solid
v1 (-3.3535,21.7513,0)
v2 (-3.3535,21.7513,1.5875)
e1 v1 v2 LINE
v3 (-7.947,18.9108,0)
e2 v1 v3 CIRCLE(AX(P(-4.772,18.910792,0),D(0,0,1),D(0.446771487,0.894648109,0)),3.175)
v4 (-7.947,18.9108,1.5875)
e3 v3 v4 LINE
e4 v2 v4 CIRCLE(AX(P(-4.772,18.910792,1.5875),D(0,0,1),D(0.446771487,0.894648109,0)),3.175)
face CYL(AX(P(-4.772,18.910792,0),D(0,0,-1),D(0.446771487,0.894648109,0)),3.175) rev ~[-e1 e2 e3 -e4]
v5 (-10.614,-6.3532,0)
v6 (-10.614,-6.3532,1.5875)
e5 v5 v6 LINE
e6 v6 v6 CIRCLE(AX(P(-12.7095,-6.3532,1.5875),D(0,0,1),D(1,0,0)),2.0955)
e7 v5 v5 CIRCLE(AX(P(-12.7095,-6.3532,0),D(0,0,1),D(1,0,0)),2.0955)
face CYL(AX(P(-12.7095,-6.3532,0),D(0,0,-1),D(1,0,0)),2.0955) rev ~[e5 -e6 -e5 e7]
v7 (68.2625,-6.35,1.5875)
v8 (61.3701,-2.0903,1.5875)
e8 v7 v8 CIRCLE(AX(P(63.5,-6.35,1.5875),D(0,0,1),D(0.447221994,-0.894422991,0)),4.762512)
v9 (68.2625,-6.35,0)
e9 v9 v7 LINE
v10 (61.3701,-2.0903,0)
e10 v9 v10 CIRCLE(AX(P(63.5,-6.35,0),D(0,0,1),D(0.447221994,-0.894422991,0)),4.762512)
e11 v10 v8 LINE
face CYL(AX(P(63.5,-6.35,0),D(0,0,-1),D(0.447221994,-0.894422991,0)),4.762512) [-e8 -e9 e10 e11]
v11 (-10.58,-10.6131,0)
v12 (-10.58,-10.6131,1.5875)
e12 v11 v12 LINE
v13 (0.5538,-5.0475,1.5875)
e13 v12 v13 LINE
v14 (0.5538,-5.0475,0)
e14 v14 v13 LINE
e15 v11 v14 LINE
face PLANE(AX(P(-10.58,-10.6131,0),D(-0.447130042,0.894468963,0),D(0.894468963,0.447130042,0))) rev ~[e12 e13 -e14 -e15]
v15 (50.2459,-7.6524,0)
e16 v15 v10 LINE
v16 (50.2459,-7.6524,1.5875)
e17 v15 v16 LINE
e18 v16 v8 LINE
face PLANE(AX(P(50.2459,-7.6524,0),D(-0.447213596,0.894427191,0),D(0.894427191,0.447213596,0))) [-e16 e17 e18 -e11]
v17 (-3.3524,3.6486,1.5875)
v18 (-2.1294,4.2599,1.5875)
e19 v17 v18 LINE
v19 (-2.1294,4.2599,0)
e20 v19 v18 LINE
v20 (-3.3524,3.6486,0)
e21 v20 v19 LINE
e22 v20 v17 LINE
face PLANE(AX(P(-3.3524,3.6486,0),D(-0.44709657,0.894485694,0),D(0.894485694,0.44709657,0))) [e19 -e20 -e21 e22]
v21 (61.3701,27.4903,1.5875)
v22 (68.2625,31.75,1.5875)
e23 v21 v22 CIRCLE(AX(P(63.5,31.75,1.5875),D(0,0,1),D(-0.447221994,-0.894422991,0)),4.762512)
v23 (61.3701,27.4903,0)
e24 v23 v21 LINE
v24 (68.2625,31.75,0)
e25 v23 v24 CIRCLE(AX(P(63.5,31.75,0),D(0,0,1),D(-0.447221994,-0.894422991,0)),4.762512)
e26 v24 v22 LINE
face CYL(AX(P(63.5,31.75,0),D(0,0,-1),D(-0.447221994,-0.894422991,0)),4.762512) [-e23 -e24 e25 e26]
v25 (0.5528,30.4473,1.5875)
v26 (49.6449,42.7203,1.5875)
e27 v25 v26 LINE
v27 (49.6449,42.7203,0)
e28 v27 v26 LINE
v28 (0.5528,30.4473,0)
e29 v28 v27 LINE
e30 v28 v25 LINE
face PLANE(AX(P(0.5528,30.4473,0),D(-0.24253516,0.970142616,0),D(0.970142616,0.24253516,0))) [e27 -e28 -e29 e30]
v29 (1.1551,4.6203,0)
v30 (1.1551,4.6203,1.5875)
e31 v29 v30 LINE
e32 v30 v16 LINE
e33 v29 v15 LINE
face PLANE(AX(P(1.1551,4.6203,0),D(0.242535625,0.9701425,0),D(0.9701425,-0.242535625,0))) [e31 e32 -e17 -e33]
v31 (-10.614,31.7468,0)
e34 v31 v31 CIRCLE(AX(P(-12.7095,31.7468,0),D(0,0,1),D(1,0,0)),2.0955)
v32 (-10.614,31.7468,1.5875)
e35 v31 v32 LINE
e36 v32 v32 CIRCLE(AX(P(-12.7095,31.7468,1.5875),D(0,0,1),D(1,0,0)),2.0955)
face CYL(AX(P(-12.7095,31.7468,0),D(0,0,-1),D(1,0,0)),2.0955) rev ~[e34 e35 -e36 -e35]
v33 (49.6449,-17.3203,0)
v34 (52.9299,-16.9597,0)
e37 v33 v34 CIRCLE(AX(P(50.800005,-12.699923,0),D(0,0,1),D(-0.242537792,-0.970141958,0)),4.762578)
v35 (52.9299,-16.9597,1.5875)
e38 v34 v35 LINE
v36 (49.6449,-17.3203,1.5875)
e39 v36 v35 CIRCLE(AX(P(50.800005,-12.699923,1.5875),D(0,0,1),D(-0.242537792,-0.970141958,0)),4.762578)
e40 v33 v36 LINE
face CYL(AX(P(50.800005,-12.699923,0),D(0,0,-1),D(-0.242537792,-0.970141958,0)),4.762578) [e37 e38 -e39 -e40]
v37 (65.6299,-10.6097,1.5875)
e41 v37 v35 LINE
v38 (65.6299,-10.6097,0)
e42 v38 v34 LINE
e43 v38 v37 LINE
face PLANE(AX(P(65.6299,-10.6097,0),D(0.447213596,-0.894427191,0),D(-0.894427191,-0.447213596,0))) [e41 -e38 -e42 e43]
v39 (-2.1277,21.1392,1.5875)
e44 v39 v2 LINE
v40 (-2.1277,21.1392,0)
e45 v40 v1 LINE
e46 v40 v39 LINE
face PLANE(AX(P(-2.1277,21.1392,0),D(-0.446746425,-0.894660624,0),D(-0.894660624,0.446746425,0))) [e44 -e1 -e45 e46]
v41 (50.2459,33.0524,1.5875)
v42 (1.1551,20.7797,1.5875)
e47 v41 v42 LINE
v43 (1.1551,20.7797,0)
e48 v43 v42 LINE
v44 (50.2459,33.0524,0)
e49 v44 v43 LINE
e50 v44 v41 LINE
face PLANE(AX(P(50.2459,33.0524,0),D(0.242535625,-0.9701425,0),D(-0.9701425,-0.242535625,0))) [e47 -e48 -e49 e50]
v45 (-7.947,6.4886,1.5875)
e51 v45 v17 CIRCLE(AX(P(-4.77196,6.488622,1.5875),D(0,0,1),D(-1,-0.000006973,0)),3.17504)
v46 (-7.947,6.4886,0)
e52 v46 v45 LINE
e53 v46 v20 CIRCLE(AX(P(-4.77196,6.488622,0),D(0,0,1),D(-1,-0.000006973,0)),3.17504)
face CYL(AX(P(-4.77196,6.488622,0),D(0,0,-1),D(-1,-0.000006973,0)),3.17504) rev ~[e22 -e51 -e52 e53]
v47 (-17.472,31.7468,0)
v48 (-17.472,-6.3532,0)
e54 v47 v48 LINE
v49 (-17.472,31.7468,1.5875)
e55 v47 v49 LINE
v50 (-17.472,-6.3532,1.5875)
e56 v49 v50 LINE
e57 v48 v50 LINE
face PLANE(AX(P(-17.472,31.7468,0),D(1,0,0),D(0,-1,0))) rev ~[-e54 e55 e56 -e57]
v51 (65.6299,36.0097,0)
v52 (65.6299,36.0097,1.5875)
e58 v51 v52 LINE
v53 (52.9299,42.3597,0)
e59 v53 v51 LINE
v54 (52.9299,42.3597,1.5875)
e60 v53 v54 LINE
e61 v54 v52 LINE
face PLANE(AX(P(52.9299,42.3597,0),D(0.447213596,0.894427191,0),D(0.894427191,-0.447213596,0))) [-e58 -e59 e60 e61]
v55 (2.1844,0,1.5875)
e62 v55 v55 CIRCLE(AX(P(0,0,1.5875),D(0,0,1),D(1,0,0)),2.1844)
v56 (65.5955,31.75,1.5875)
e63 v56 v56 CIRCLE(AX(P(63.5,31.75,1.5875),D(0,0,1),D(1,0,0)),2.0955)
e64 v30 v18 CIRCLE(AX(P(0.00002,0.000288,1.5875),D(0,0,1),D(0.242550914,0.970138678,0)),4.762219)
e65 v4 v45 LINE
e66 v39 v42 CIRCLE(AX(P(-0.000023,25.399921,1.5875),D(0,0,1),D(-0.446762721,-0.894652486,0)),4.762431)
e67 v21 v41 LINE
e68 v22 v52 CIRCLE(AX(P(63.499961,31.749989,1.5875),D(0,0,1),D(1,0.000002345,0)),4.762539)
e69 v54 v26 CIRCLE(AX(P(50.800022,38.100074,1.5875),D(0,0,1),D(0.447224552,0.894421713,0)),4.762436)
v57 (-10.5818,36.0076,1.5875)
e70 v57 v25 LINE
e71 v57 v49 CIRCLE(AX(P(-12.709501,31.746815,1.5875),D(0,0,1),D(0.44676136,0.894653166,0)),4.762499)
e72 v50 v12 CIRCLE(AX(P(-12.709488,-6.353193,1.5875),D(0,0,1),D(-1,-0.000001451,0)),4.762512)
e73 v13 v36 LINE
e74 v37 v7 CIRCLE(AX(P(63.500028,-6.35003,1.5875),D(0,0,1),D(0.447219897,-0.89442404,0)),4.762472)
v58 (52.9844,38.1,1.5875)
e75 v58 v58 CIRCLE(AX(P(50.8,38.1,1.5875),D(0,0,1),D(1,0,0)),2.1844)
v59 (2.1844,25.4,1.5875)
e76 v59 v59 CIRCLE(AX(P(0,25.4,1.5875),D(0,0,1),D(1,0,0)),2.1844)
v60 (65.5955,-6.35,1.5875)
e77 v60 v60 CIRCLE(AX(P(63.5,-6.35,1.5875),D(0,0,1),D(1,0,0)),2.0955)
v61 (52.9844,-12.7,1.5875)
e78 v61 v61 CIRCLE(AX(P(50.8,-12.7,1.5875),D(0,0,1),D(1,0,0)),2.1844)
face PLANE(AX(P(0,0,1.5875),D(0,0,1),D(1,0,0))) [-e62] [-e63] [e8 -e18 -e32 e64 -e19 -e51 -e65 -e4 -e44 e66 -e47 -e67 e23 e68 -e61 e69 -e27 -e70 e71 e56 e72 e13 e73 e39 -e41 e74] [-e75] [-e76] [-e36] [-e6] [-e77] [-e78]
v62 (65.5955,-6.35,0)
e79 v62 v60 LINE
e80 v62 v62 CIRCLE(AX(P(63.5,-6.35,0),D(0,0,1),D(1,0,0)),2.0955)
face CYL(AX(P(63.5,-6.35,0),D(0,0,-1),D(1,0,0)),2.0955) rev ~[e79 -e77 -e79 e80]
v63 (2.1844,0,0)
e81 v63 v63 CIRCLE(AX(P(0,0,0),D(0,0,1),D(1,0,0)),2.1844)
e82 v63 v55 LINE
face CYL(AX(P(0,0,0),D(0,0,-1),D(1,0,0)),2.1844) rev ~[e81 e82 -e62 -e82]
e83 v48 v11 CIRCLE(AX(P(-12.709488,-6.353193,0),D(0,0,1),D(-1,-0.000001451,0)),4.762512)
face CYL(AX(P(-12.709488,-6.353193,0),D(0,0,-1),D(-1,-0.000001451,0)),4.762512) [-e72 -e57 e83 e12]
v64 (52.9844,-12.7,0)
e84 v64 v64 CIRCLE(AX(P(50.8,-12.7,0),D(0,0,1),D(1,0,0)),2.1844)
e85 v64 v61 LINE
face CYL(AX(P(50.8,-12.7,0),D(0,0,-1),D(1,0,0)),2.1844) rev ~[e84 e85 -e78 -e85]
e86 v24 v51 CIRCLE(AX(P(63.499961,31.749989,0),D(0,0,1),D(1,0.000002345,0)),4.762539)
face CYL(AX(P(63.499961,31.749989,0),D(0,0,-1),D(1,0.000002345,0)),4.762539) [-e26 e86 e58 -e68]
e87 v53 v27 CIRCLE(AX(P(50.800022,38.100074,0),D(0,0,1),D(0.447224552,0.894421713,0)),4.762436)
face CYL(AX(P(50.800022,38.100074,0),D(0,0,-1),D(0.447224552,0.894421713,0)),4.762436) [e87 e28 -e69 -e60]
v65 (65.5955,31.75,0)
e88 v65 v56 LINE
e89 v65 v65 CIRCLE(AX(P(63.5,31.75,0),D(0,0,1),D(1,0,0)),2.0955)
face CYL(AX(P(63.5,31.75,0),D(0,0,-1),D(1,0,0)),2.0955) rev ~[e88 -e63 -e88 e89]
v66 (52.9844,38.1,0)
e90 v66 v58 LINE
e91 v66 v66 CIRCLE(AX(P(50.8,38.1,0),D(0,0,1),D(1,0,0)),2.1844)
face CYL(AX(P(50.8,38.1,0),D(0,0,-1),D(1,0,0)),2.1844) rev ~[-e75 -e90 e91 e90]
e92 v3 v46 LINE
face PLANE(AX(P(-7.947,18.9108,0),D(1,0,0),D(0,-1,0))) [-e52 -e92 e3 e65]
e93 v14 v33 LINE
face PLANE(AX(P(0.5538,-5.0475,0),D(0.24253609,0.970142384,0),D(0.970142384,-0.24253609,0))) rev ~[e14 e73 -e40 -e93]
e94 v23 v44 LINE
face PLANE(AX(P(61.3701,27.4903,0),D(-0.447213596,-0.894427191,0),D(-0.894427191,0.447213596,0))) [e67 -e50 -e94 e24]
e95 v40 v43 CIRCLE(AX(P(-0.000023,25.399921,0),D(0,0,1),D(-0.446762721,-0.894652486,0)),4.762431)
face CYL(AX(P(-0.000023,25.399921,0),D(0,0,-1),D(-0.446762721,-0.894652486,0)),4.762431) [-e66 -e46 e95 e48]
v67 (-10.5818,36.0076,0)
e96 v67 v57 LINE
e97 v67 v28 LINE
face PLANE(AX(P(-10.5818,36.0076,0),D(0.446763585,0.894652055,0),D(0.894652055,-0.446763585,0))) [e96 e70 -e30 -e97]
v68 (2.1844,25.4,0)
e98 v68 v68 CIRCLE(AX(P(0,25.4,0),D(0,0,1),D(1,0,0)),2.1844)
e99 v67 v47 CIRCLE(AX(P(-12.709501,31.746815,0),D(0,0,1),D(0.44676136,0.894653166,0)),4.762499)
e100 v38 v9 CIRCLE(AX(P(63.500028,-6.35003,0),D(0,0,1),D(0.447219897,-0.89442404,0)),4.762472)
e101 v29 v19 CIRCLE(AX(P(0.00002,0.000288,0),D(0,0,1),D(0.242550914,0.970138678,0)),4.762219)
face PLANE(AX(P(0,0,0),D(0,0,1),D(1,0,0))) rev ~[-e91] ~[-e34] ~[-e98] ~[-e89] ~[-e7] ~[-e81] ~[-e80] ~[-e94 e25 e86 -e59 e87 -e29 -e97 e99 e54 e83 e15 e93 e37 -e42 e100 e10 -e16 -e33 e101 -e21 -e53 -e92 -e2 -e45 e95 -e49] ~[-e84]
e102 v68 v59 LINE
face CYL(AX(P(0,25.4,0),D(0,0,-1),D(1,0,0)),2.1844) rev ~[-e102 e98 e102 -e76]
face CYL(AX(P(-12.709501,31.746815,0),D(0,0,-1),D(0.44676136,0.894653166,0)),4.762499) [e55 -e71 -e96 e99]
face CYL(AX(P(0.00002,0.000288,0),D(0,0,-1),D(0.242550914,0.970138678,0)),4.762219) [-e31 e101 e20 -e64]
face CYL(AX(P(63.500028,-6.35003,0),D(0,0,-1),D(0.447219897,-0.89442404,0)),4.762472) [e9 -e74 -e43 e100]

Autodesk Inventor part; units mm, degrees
ref_plane "YZ Plane" through (0, 0, 0) normal (1, 0, 0) x (0, 1, 0)
ref_plane "XZ Plane" through (0, 0, 0) normal (0, 1, 0) x (-1, 0, 0)
ref_plane "XY Plane" through (0, 0, 0) normal (0, 0, 1) x (1, 0, 0)
sketch "main" plane through (0, 0, 0) normal (0, 0, 1) x (1, 0, 0)
  circle A0 centre (37.6731, -16.4179) radius 2.0955
  circle A1 centre (37.6731, 21.6821) radius 2.0955
  circle A2 centre (24.9731, 28.0321) radius 2.1844
  circle A3 centre (24.9731, -22.7679) radius 2.1844
  circle A4 centre (-38.5364, -16.421) radius 2.0955
  circle A5 centre (-38.5364, 21.679) radius 2.0955
  circle A6 centre (-25.8269, -10.0679) radius 2.1844
  circle A7 centre (-25.8269, 15.3321) radius 2.1844
  arc A8 (-27.9546, 11.0714) -> (-24.6718, 10.7118) centre (-25.8269, 15.3321) ccw
  arc A9 (27.103, 32.2919) -> (23.818, 32.6525) centre (24.9731, 28.0321) ccw
  arc A10 (42.4356, 21.6821) -> (39.803, 25.9419) centre (37.6731, 21.6821) ccw
  arc A11 (39.803, -20.6776) -> (42.4356, -16.4179) centre (37.6731, -16.4179) ccw
  arc A12 (23.818, -27.3882) -> (27.103, -27.0276) centre (24.9731, -22.7679) ccw
  arc A13 (-24.6718, -5.4475) -> (-27.9563, -5.8079) centre (-25.8269, -10.0679) ccw
  arc A14 (-43.2989, -16.421) -> (-36.4069, -20.6809) centre (-38.5364, -16.421) ccw
  arc A15 (-36.4086, 25.9397) -> (-43.2989, 21.679) centre (-38.5364, 21.679) ccw
  line L0 (-43.2989, 21.679) -> (-43.2989, -16.421)
  line L1 (-36.4069, -20.6809) -> (-25.273, -15.1154)
  line L2 (-36.4086, 25.9397) -> (-25.2741, 20.3794)
  line L3 (-25.2741, 20.3794) -> (23.818, 32.6525)
  line L4 (27.103, 32.2919) -> (39.803, 25.9419)
  line L5 (39.803, -20.6776) -> (27.103, -27.0276)
  line L6 (-25.273, -15.1154) -> (23.818, -27.3882)
  line L7 (-27.9546, 11.0714) -> (-29.1804, 11.6835)
  line L8 (-33.7739, 8.843) -> (-33.7739, -3.5793)
  line L9 (-29.1792, -6.4192) -> (-27.9563, -5.8079)
  line L10 (-24.6718, -5.4475) -> (24.419, -17.7203)
  line L11 (24.419, -17.7203) -> (35.5433, -12.1581)
  line L12 (35.5433, 17.4224) -> (24.419, 22.9846)
  line L13 (24.419, 22.9846) -> (-24.6718, 10.7118)
  arc A16 (-33.7739, -3.5793) -> (-29.1792, -6.4192) centre (-30.5989, -3.5793) ccw
  arc A17 (-29.1804, 11.6835) -> (-33.7739, 8.843) centre (-30.5989, 8.843) ccw
  arc A18 (35.5433, 17.4224) -> (39.803, 25.9419) centre (37.6731, 21.6821) ccw
  arc A19 (39.803, -20.6776) -> (35.5433, -12.1581) centre (37.6731, -16.4179) ccw
  point P0 (-0.4291, 2.6313)
  point P1 (-25.8269, -22.7679)
  dimension "d9" = 9.525
  dimension "d10" = 9.525
  dimension "d11" = 9.525
  dimension "d12" = 9.525
  dimension "d13" = 9.525
  dimension "d14" = 9.525
  dimension "d15" = 9.525
  dimension "d16" = 9.525
  dimension "d17" = 9.525
  dimension "d20" = 12.7
  dimension "d21" = 25.4
  dimension "d22" = 3.175
sketch "Sketch1" plane through (0, 0, 0) normal (0, 0, 1) x (1, 0, 0)
  circle A0 centre (63.5, -6.35) radius 2.0955
  circle A1 centre (63.5, 31.75) radius 2.0955
  circle A2 centre (50.8, 38.1) radius 2.1844
  circle A3 centre (50.8, -12.7) radius 2.1844
  circle A4 centre (-12.7095, -6.3532) radius 2.0955
  circle A5 centre (-12.7095, 31.7468) radius 2.0955
  circle A6 centre (0, 0) radius 2.1844
  circle A7 centre (0, 25.4) radius 2.1844
  arc A8 (-2.1277, 21.1392) -> (1.1551, 20.7797) centre (0, 25.4) ccw
  arc A9 (52.9299, 42.3597) -> (49.6449, 42.7203) centre (50.8, 38.1) ccw
  arc A10 (68.2625, 31.75) -> (65.6299, 36.0097) centre (63.5, 31.75) ccw
  arc A11 (65.6299, -10.6097) -> (68.2625, -6.35) centre (63.5, -6.35) ccw
  arc A12 (49.6449, -17.3203) -> (52.9299, -16.9597) centre (50.8, -12.7) ccw
  arc A13 (1.1551, 4.6203) -> (-2.1294, 4.2599) centre (0, 0) ccw
  arc A14 (-17.472, -6.3532) -> (-10.58, -10.6131) centre (-12.7095, -6.3532) ccw
  arc A15 (-10.5818, 36.0076) -> (-17.472, 31.7468) centre (-12.7095, 31.7468) ccw
  line L0 (-17.472, 31.7468) -> (-17.472, -6.3532)
  line L1 (-10.58, -10.6131) -> (0.5538, -5.0475)
  line L2 (-10.5818, 36.0076) -> (0.5528, 30.4473)
  line L3 (0.5528, 30.4473) -> (49.6449, 42.7203)
  line L4 (52.9299, 42.3597) -> (65.6299, 36.0097)
  line L5 (65.6299, -10.6097) -> (52.9299, -16.9597)
  line L6 (0.5538, -5.0475) -> (49.6449, -17.3203)
  line L7 (-2.1277, 21.1392) -> (-3.3535, 21.7513)
  line L8 (-7.947, 18.9108) -> (-7.947, 6.4886)
  line L9 (-3.3524, 3.6486) -> (-2.1294, 4.2599)
  line L10 (1.1551, 4.6203) -> (50.2459, -7.6524)
  line L11 (50.2459, -7.6524) -> (61.3701, -2.0903)
  line L12 (61.3701, 27.4903) -> (50.2459, 33.0524)
  line L13 (50.2459, 33.0524) -> (1.1551, 20.7797)
  arc A16 (-7.947, 6.4886) -> (-3.3524, 3.6486) centre (-4.772, 6.4886) ccw
  arc A17 (-3.3535, 21.7513) -> (-7.947, 18.9108) centre (-4.772, 18.9108) ccw
  arc A18 (61.3701, 27.4903) -> (65.6299, 36.0097) centre (63.5, 31.75) ccw
  arc A19 (65.6299, -10.6097) -> (61.3701, -2.0903) centre (63.5, -6.35) ccw
  point P0 (68.2625, -6.35)
  point P1 (68.2625, 31.75)
extrude "Extrusion1" add sketch "Sketch1" along normal blind 1.5875
properties part number "Brain Mount" material "Acetal Resin, White"
